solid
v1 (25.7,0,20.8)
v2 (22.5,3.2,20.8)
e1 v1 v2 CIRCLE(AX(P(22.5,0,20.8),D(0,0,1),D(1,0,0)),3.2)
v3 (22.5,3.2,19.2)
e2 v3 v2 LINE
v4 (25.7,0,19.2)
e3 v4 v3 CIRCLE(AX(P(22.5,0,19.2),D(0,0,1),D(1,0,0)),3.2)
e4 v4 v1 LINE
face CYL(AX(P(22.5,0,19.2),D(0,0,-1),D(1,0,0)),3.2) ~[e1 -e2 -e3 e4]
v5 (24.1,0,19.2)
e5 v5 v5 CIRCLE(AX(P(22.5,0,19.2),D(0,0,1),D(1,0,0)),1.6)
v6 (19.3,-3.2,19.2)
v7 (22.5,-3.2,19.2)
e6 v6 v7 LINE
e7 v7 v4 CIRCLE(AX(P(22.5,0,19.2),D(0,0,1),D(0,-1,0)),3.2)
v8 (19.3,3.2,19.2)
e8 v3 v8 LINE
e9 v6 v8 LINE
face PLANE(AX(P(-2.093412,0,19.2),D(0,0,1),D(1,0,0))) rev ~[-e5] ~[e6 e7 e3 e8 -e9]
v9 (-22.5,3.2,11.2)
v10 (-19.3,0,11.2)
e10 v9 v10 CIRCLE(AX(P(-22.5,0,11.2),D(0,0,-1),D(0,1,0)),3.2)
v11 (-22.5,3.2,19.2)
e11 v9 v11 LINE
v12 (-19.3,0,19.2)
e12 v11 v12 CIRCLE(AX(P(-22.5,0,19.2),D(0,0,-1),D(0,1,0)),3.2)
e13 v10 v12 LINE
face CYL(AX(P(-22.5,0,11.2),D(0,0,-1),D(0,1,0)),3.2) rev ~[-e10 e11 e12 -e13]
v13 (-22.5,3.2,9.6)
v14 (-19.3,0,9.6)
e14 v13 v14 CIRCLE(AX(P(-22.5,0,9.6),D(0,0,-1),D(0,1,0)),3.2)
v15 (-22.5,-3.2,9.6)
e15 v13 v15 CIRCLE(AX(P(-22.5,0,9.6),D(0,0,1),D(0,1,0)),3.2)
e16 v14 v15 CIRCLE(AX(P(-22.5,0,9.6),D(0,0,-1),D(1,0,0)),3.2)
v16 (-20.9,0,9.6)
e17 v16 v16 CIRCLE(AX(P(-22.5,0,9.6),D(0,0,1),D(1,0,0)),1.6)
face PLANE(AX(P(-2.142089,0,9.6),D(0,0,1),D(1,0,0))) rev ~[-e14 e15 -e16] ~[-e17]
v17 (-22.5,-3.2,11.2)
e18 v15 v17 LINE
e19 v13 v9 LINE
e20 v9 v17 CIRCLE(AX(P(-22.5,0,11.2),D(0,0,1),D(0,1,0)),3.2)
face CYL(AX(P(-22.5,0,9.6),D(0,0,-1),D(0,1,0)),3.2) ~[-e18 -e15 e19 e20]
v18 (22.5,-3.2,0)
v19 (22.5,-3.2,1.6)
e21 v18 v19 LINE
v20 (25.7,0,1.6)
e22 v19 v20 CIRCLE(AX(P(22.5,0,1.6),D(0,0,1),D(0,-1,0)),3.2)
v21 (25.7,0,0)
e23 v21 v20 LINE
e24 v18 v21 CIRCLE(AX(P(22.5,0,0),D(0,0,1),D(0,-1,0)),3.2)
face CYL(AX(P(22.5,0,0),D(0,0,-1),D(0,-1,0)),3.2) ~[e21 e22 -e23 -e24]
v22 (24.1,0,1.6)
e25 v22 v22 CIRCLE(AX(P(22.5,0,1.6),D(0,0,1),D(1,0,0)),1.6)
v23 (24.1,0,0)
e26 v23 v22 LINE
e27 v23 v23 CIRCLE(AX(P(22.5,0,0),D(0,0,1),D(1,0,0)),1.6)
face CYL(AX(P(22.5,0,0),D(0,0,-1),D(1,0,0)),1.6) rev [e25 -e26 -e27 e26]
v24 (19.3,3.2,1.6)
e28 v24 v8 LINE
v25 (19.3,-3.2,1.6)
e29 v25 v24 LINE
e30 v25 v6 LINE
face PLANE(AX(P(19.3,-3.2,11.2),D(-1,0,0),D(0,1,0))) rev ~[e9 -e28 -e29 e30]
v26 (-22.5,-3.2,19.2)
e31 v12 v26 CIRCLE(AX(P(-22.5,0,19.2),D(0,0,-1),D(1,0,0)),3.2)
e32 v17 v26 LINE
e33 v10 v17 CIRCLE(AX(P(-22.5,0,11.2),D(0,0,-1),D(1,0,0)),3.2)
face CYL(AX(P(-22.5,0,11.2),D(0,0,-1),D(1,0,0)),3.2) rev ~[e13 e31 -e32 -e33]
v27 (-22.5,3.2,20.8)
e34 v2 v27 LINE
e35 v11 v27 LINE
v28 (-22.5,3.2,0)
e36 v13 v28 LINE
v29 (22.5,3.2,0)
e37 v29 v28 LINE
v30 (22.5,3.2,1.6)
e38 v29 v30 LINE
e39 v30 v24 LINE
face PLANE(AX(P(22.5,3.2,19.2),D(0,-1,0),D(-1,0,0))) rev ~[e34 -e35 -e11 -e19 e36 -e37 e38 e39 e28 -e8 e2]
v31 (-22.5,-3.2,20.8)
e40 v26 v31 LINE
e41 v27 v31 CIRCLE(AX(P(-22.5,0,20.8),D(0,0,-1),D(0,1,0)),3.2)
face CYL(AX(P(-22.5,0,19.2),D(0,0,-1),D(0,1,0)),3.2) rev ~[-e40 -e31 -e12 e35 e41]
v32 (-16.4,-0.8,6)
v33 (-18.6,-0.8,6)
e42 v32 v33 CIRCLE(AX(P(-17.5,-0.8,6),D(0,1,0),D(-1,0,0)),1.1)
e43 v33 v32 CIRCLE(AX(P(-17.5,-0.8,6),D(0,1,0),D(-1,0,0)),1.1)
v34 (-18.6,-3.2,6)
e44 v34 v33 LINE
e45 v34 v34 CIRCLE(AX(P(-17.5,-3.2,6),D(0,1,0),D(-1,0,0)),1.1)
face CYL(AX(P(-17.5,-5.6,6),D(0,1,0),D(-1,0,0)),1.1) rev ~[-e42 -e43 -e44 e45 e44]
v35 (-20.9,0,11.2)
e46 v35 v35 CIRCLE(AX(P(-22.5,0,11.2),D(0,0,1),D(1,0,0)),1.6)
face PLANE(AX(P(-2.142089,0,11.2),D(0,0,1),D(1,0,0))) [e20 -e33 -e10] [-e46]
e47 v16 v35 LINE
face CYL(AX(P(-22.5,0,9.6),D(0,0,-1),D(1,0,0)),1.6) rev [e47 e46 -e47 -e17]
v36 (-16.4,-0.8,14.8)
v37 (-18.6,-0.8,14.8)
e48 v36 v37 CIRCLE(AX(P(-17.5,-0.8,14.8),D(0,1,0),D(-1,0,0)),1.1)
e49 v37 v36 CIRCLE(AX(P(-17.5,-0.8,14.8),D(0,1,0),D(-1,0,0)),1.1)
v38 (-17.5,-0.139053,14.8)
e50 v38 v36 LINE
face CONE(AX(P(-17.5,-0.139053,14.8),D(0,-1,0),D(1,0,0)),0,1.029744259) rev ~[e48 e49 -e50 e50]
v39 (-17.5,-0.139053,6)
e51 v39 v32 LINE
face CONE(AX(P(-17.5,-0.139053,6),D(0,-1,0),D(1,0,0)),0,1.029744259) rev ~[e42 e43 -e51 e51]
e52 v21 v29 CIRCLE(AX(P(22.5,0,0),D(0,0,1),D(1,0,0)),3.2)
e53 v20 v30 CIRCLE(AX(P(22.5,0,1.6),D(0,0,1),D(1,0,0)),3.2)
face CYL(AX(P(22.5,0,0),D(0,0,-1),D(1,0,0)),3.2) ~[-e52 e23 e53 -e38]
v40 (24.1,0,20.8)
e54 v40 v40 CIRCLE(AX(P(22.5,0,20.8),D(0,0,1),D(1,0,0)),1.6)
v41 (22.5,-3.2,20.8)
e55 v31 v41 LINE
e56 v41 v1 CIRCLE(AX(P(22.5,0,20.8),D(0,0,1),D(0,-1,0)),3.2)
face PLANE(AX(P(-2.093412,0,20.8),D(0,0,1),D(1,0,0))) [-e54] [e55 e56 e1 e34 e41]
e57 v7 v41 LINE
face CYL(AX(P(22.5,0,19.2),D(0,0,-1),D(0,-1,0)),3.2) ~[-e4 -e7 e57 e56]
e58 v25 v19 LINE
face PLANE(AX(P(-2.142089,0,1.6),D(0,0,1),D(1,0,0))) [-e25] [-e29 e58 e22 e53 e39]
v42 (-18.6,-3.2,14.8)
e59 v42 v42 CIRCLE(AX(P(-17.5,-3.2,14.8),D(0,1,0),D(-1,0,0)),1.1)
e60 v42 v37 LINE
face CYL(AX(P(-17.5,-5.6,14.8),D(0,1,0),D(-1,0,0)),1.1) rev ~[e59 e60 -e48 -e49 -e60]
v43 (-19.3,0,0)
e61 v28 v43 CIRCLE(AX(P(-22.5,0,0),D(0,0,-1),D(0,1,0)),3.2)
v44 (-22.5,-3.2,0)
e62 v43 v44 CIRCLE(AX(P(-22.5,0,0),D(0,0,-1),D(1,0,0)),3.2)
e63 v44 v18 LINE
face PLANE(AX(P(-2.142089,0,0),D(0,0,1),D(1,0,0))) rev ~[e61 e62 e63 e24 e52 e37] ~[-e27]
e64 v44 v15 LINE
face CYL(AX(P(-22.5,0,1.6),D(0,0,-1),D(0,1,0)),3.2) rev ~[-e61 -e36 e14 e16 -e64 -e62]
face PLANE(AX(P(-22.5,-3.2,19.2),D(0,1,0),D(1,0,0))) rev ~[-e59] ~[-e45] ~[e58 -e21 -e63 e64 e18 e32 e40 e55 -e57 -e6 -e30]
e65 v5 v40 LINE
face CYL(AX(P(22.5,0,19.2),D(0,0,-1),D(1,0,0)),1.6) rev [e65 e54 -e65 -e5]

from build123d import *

# Parameters (mm, degrees)
F0_R      = 1.6
F1_DEPTH  = 1.6
F4_DEPTH  = 8
F5_R      = 1.6
F6_DEPTH  = 1.6
F8_DEPTH  = 8
F9_R      = 1.6
F10_DEPTH = 1.6
F12_D     = 2.2
F12_DEPTH = 2.4
F12_TIP   = 0.6609466809


with BuildPart() as f1:
    # F0 (on Top) → F1 (new body)
    with BuildSketch(Plane.XY):
        with BuildLine():
            Line((19.3, 3.2), (-22.5, 3.2))
            ThreePointArc((-22.5, 3.2), (-20.2372583002, 2.2627416998), (-19.3, 0))
            ThreePointArc((-19.3, 0), (-20.2372583002, -2.2627416998), (-22.5, -3.2))
            Line((-22.5, -3.2), (19.3, -3.2))
            Line((19.3, -3.2), (19.3, 0))
            Line((19.3, 0), (19.3, 3.2))
        make_face()
        with BuildLine():
            Line((22.5, 3.2), (19.3, 3.2))
            Line((19.3, 3.2), (19.3, 0))
            ThreePointArc((19.3, 0), (20.2372583002, 2.2627416998), (22.5, 3.2))
        make_face()
        with BuildLine():
            ThreePointArc((25.7, 0), (24.7627416998, 2.2627416998), (22.5, 3.2))
            ThreePointArc((22.5, 3.2), (20.2372583002, 2.2627416998), (19.3, 0))
            ThreePointArc((19.3, 0), (20.2372583002, -2.2627416998), (22.5, -3.2))
            ThreePointArc((22.5, -3.2), (24.7627416998, -2.2627416998), (25.7, 0))
        make_face()
        with Locations((22.5, 0)):
            Circle(F0_R, mode=Mode.SUBTRACT)
        with BuildLine():
            Line((19.3, 0), (19.3, -3.2))
            Line((19.3, -3.2), (22.5, -3.2))
            ThreePointArc((22.5, -3.2), (20.2372583002, -2.2627416998), (19.3, 0))
        make_face()
    extrude(amount=F1_DEPTH)

    # F3 (on offset) → F4 (join)
    with BuildSketch(Plane.XY.offset(1.6)):
        with BuildLine():
            ThreePointArc((-22.5, 3.2), (-20.2372583002, 2.2627416998), (-19.3, 0))
            ThreePointArc((-19.3, 0), (-20.2372583002, -2.2627416998), (-22.5, -3.2))
            Line((-22.5, -3.2), (19.3, -3.2))
            Line((19.3, -3.2), (19.3, 0))
            Line((19.3, 0), (19.3, 3.2))
            Line((19.3, 3.2), (-22.5, 3.2))
        make_face()
    extrude(amount=F4_DEPTH)

    # F5 (on face) → F6 (join)
    with BuildSketch(Plane.XY.offset(9.6)):
        with BuildLine():
            Line((-22.5, -3.2), (19.3, -3.2))
            Line((19.3, -3.2), (19.3, 3.2))
            Line((19.3, 3.2), (-22.5, 3.2))
            ThreePointArc((-22.5, 3.2), (-20.2372583002, 2.2627416998), (-19.3, 0))
            ThreePointArc((-19.3, 0), (-20.2372583002, -2.2627416998), (-22.5, -3.2))
        make_face()
        with BuildLine():
            ThreePointArc((-22.5, 3.2), (-25.7, 0), (-22.5, -3.2))
            ThreePointArc((-22.5, -3.2), (-20.2372583002, -2.2627416998), (-19.3, 0))
            ThreePointArc((-19.3, 0), (-20.2372583002, 2.2627416998), (-22.5, 3.2))
        make_face()
        with Locations((-22.5, 0)):
            Circle(F5_R, mode=Mode.SUBTRACT)
    extrude(amount=F6_DEPTH)

    # F7 (on face) → F8 (join)
    with BuildSketch(Plane.XY.offset(11.2)):
        with BuildLine():
            Line((-22.5, -3.2), (19.3, -3.2))
            Line((19.3, -3.2), (19.3, 0))
            Line((19.3, 0), (19.3, 3.2))
            Line((19.3, 3.2), (-22.5, 3.2))
            ThreePointArc((-22.5, 3.2), (-20.2372583002, 2.2627416998), (-19.3, 0))
            ThreePointArc((-19.3, 0), (-20.2372583002, -2.2627416998), (-22.5, -3.2))
        make_face()
    extrude(amount=F8_DEPTH)

    # F9 (on face) → F10 (join)
    with BuildSketch(Plane.XY.offset(19.2)):
        with BuildLine():
            Line((19.3, -3.2), (19.3, 0))
            Line((19.3, 0), (19.3, 3.2))
            Line((19.3, 3.2), (-22.5, 3.2))
            ThreePointArc((-22.5, 3.2), (-19.3, 0), (-22.5, -3.2))
            Line((-22.5, -3.2), (19.3, -3.2))
        make_face()
        with BuildLine():
            ThreePointArc((19.3, 0), (20.2372583002, 2.2627416998), (22.5, 3.2))
            Line((22.5, 3.2), (19.3, 3.2))
            Line((19.3, 3.2), (19.3, 0))
        make_face()
        with BuildLine():
            ThreePointArc((22.5, -3.2), (24.7627416998, -2.2627416998), (25.7, 0))
            ThreePointArc((25.7, 0), (24.7627416998, 2.2627416998), (22.5, 3.2))
            ThreePointArc((22.5, 3.2), (20.2372583002, 2.2627416998), (19.3, 0))
            ThreePointArc((19.3, 0), (20.2372583002, -2.2627416998), (22.5, -3.2))
        make_face()
        with Locations((22.5, 0)):
            Circle(F9_R, mode=Mode.SUBTRACT)
        with BuildLine():
            Line((19.3, -3.2), (22.5, -3.2))
            ThreePointArc((22.5, -3.2), (20.2372583002, -2.2627416998), (19.3, 0))
            Line((19.3, 0), (19.3, -3.2))
        make_face()
    extrude(amount=F10_DEPTH)

    # F12
    with Locations(Plane.XZ.offset(3.2)):
        with Locations((-17.5, 14.8), (-17.5, 6)):
            Hole(F12_D / 2, depth=F12_DEPTH)
            with Locations((0, 0, -(F12_DEPTH + F12_TIP / 2))):  # 118° drill point
                Cone(0, F12_D / 2, F12_TIP, mode=Mode.SUBTRACT)


solid = f1.part
